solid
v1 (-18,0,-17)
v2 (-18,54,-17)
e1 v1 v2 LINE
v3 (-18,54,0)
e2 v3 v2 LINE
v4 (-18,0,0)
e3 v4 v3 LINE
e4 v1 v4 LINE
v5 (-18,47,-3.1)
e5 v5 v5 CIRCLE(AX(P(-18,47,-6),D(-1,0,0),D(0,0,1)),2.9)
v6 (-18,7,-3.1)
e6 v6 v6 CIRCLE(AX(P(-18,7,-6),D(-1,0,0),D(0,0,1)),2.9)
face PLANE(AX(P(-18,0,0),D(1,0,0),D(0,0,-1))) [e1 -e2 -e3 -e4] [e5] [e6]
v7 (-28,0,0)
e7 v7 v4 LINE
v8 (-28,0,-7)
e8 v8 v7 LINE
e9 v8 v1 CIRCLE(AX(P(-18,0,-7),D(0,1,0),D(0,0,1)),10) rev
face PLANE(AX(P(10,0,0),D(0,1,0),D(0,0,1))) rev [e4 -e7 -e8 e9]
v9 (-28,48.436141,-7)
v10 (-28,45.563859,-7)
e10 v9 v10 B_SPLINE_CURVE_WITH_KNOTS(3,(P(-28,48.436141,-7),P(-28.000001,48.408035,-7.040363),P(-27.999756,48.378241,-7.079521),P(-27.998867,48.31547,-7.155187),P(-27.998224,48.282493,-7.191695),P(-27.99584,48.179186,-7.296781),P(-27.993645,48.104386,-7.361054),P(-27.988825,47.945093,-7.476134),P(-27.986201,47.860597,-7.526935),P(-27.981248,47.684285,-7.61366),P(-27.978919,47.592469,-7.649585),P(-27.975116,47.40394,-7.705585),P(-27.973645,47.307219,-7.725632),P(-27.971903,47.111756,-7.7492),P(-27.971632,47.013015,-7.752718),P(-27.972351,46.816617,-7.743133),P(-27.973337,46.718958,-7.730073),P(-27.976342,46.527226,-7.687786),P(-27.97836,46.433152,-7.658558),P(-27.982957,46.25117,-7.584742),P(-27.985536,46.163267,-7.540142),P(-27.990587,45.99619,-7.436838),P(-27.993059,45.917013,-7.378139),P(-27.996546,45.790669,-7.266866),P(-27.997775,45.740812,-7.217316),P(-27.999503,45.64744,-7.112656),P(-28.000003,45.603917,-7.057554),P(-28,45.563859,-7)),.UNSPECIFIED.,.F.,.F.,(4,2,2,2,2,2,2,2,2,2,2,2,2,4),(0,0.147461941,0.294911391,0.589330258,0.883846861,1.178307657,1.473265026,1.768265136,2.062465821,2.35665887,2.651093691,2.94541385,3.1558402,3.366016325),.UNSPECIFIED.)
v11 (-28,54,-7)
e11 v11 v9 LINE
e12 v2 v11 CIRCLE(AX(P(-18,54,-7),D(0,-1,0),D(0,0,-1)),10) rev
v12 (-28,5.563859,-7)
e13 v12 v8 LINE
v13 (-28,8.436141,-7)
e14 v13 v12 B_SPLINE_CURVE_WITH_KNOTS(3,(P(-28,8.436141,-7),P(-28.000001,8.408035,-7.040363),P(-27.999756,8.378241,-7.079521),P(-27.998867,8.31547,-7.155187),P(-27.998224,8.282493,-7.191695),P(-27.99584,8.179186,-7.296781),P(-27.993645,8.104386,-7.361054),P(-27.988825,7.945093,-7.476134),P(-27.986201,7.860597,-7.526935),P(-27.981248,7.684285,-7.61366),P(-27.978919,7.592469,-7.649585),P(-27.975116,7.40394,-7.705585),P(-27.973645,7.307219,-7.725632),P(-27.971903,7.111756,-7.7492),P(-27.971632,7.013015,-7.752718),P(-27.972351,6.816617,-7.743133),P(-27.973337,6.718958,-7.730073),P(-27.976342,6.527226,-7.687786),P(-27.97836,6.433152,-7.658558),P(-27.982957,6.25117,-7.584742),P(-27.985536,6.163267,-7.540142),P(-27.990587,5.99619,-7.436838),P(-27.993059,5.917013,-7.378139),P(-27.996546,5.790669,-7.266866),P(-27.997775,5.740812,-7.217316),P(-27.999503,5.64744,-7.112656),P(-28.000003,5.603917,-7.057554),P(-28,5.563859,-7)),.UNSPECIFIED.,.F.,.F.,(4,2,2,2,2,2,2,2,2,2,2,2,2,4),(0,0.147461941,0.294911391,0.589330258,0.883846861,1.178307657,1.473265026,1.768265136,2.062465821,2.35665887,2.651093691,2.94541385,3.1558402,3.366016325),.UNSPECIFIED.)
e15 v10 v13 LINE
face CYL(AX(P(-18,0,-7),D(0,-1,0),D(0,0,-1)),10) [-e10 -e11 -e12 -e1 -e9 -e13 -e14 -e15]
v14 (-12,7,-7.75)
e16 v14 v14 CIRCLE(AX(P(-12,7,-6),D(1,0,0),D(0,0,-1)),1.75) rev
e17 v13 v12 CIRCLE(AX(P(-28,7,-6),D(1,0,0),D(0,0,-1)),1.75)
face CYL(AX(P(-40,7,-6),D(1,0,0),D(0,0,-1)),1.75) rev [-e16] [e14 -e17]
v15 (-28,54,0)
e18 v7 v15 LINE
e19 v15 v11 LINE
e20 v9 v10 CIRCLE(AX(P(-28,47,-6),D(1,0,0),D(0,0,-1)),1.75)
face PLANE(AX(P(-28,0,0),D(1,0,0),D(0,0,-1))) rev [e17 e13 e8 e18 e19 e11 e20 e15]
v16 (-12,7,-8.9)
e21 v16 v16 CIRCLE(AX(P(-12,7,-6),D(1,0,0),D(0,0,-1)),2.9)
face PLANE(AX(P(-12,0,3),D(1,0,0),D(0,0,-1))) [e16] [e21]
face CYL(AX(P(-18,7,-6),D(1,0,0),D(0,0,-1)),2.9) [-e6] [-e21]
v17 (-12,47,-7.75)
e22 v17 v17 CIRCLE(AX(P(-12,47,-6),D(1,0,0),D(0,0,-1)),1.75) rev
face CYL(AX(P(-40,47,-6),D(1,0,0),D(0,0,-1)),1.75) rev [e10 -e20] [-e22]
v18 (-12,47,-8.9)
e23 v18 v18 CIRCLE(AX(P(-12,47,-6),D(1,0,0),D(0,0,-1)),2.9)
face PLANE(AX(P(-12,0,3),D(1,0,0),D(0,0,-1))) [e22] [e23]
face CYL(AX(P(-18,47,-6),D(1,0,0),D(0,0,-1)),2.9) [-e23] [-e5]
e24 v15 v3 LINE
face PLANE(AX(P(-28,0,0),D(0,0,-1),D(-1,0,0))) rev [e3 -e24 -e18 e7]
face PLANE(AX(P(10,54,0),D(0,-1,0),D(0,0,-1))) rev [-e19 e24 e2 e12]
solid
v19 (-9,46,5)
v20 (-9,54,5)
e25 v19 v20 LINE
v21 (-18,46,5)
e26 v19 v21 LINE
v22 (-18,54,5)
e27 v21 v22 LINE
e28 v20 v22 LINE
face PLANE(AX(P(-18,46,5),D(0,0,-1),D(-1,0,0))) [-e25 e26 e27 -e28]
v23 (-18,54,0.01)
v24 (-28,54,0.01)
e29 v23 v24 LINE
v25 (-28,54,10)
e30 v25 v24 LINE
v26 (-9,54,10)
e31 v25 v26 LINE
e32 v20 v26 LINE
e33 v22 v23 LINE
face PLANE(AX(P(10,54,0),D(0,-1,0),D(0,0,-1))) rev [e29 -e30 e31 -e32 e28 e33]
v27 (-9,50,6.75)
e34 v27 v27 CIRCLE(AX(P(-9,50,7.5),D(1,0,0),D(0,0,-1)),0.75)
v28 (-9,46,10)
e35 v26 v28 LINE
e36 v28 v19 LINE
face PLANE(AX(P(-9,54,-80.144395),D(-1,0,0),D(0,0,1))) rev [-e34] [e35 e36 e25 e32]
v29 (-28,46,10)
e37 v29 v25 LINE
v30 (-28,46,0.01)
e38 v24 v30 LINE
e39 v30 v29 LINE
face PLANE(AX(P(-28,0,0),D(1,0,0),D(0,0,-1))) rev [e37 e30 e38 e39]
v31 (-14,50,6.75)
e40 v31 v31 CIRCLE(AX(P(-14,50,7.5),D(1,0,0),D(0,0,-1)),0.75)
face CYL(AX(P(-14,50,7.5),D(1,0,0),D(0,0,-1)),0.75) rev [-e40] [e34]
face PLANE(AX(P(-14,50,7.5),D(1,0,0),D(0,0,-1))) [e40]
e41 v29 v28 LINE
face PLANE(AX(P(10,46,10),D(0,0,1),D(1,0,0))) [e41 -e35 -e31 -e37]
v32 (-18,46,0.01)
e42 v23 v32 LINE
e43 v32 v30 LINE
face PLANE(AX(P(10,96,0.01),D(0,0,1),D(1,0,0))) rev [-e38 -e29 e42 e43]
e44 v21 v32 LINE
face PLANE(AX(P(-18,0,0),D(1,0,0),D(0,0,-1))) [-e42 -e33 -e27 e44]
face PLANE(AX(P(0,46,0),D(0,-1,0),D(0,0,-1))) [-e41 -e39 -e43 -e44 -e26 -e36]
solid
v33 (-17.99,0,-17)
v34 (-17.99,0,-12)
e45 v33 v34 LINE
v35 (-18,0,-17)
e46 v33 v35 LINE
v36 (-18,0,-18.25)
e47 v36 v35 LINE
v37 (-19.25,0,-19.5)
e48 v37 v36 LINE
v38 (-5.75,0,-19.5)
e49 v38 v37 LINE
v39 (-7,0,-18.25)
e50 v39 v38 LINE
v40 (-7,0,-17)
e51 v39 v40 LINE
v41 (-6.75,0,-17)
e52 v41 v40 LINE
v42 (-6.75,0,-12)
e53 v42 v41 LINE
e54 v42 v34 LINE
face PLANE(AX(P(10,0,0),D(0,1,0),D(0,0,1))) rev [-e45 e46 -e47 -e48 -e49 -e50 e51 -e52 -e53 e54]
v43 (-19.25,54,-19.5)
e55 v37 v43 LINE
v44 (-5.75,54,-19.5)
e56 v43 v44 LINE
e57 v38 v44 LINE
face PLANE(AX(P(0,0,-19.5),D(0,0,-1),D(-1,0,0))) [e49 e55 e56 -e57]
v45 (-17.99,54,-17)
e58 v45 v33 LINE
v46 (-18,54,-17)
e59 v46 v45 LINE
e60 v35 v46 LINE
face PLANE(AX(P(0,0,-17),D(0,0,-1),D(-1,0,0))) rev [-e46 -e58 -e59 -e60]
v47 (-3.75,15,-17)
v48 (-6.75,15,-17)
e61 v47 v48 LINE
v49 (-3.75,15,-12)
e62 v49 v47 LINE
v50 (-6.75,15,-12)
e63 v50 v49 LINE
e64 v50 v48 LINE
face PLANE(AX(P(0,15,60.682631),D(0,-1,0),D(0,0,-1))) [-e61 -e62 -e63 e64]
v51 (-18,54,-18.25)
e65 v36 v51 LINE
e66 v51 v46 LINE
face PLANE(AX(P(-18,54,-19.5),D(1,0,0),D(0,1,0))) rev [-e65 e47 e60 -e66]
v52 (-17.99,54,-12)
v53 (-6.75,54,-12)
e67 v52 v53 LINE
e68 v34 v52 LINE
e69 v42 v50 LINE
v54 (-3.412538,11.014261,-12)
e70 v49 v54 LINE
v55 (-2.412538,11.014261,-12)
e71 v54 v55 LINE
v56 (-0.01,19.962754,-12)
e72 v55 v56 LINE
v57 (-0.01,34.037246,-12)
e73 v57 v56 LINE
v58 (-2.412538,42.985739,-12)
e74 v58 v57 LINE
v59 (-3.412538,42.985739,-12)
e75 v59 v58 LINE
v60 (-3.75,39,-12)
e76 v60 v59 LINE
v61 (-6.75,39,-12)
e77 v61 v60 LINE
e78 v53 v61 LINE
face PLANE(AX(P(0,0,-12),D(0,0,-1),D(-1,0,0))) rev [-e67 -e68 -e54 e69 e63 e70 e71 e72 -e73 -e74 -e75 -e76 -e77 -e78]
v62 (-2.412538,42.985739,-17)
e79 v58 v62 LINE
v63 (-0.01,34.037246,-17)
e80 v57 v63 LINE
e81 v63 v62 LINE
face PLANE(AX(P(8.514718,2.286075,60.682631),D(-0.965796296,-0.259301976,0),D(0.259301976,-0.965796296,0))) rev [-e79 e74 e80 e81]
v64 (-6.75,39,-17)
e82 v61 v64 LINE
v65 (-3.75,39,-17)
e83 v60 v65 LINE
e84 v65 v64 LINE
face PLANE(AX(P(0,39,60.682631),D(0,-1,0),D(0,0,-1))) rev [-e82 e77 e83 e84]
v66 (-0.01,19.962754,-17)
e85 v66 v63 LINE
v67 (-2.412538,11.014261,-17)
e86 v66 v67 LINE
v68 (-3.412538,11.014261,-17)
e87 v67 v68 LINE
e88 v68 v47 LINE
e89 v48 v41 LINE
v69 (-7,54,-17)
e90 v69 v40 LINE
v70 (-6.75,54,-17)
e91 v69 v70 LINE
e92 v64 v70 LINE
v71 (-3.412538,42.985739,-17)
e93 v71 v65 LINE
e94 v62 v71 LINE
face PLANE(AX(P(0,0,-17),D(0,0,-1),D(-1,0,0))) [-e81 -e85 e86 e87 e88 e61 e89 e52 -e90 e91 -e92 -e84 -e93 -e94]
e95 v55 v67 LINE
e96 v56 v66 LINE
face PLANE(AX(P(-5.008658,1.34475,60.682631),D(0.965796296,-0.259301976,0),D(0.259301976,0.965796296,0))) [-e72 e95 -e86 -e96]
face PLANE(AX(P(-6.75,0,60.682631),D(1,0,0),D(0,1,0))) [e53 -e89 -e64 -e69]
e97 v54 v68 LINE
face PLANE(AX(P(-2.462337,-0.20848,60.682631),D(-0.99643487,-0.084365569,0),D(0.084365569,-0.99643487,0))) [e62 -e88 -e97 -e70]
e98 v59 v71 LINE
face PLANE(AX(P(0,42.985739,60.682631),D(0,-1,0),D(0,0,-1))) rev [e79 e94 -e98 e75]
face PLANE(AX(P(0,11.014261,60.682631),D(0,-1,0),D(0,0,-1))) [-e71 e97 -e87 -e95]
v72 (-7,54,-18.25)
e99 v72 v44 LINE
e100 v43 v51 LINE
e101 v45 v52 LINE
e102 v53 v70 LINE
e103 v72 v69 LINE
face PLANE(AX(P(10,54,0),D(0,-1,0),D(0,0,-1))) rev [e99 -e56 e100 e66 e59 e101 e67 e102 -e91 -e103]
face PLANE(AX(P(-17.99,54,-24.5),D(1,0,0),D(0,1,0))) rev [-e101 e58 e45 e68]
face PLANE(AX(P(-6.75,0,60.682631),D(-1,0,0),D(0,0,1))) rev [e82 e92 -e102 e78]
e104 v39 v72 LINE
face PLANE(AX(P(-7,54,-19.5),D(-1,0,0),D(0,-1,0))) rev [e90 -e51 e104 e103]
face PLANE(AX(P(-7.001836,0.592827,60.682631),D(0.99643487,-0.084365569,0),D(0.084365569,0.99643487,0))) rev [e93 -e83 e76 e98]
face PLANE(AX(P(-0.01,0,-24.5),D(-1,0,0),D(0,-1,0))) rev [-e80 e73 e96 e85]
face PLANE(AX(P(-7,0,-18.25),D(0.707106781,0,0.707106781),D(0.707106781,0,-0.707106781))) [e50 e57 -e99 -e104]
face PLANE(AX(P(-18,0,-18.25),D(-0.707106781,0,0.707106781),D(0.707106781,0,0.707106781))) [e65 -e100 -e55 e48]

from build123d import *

# Parameters (mm, degrees)
SKETCH1_W           = 12
SKETCH1_H           = 54
BOSS_EXTRUDE1_DEPTH = 10
SKETCH2_R           = 2.9
BOSS_EXTRUDE2_DEPTH = 18
SKETCH3_W           = 12
SKETCH3_H           = 54
BOSS_EXTRUDE3_DEPTH = 10
SKETCH4_R           = 1.75
CUT_EXTRUDE1_DEPTH  = 50
SKETCH5_W           = 38
SKETCH5_H           = 54
BOSS_EXTRUDE4_DEPTH = 5
FILLET1_R           = 10
SKETCH6_W           = 6
SKETCH6_H           = 54
CUT_EXTRUDE2_DEPTH  = 15
SKETCH7_W           = 0.01
SKETCH7_H           = 54
CUT_EXTRUDE3_DEPTH  = 12.5
BOSS_EXTRUDE5_DEPTH = 8
SKETCH9_W           = 38
SKETCH9_H           = 0.01
CUT_EXTRUDE4_DEPTH  = 50
SKETCH10_W          = 11
SKETCH10_H          = 54
BOSS_EXTRUDE6_DEPTH = 2.5
BOSS_EXTRUDE7_DEPTH = 54
CUT_EXTRUDE5_DEPTH  = 5
SKETCH14_W          = 32.887251504
SKETCH14_H          = 59.683223859
CUT_EXTRUDE6_DEPTH  = 22
SKETCH15_R          = 0.75
CUT_EXTRUDE7_DEPTH  = 5


with BuildPart() as part:
    # Sketch1 → Boss-Extrude1 (new body)
    with BuildSketch(Plane(origin=(0, 0, 0), x_dir=(0, 0, -1), z_dir=(1, 0, 0))):
        with Locations((6, 27)):
            Rectangle(SKETCH1_W, SKETCH1_H)
    extrude(amount=BOSS_EXTRUDE1_DEPTH)

    # Sketch2 → Boss-Extrude2 (add)
    with BuildSketch(Plane.ZY):
        with Locations((-6, 47)):
            Circle(SKETCH2_R)
        with Locations((-6, 7)):
            Circle(SKETCH2_R)
    extrude(amount=BOSS_EXTRUDE2_DEPTH)

    # Sketch3 → Boss-Extrude3 (add)
    with BuildSketch(Plane.ZY.offset(18)):
        with Locations((-6, 27)):
            Rectangle(SKETCH3_W, SKETCH3_H)
    extrude(amount=BOSS_EXTRUDE3_DEPTH)

    # Sketch4 → Cut-Extrude1 (cut)
    with BuildSketch(Plane(origin=(10, 0, 0), x_dir=(0, 0, -1), z_dir=(1, 0, 0))):
        with Locations((6, 47)):
            Circle(SKETCH4_R)
        with Locations((6, 7)):
            Circle(SKETCH4_R)
    extrude(amount=-CUT_EXTRUDE1_DEPTH, mode=Mode.SUBTRACT)

    # Sketch5 → Boss-Extrude4 (add)
    with BuildSketch(Plane(origin=(0, 0, -12), x_dir=(-1, 0, 0), z_dir=(0, 0, -1))):
        with Locations((9, 27)):
            Rectangle(SKETCH5_W, SKETCH5_H)
    extrude(amount=BOSS_EXTRUDE4_DEPTH)

    # Fillet1
    # the kernel refuses this fillet: 10 mm, written as the material it takes off along each edge
    with BuildSketch(Plane(origin=(10, -25, -17), x_dir=(-1, 0, 0), z_dir=(0, 1, 0))) as fillet1_piece_1:
        with BuildLine():
            CenterArc((FILLET1_R, FILLET1_R), FILLET1_R, 180, 90)
            Line((0, FILLET1_R), (0, 0))
            Line((0, 0), (FILLET1_R, 0))
        make_face()
    extrude(amount=104, mode=Mode.SUBTRACT)
    with BuildSketch(Plane(origin=(-28, 79, -17), x_dir=(0, 0, 1), z_dir=(0, -1, 0))) as fillet1_piece_2:
        with BuildLine():
            CenterArc((FILLET1_R, -FILLET1_R), FILLET1_R, 90, 90)
            Line((0, -FILLET1_R), (0, 0))
            Line((0, 0), (FILLET1_R, 0))
        make_face()
    extrude(amount=104, mode=Mode.SUBTRACT)

    # Sketch6 → Cut-Extrude2 (cut)
    with BuildSketch(Plane.XY.offset(-12)):
        with Locations((-9, 27)):
            Rectangle(SKETCH6_W, SKETCH6_H)
    extrude(amount=CUT_EXTRUDE2_DEPTH, mode=Mode.SUBTRACT)

    # Sketch7 → Cut-Extrude3 (cut)
    with BuildSketch(Plane.XY.offset(-12)):
        with Locations((-17.995, 27)):
            Rectangle(SKETCH7_W, SKETCH7_H)
        with Locations((-0.005, 27)):
            Rectangle(SKETCH7_W, SKETCH7_H)
    extrude(amount=-CUT_EXTRUDE3_DEPTH, mode=Mode.SUBTRACT)


with BuildPart() as cut_extrude3_piece_1:
    # of the separate pieces the step leaves, piece 1, a body of its own (cut_extrude3_pieces)
    add(part.part.solids().sort_by_distance((-18, 0, 0))[0])



with BuildPart() as cut_extrude3_piece_2:
    # of the separate pieces the step leaves, piece 2, a body of its own (cut_extrude3_pieces)
    add(part.part.solids().sort_by_distance((0, 0, -17))[0])


with BuildPart() as cut_extrude3_piece_3:
    # of the separate pieces the step leaves, piece 3, a body of its own (cut_extrude3_pieces)
    add(part.part.solids().sort_by_distance((-17.99, 0, -12))[0])



with BuildPart() as cut_extrude3_piece_1_1:
    add(cut_extrude3_piece_1.part)

    add(cut_extrude3_piece_2.part)  # Boss-Extrude5 merges Cut-Extrude3 piece 2
    # Sketch8 → Boss-Extrude5 (add)
    with BuildSketch(Plane(origin=(0, 54, 0), x_dir=(1, 0, 0), z_dir=(0, 1, 0))):
        Polygon((-18, 0), (-18, -5), (0, -5), (0, 0), (10, 0), (10, -10), (-28, -10), (-28, 0), align=None)
    extrude(amount=-BOSS_EXTRUDE5_DEPTH)

    # Sketch9 → Cut-Extrude4 (cut)
    with BuildSketch(Plane.XZ.offset(-46)):
        with Locations((-9, 0.005)):
            Rectangle(SKETCH9_W, SKETCH9_H)
    extrude(amount=-CUT_EXTRUDE4_DEPTH, mode=Mode.SUBTRACT)


with BuildPart() as cut_extrude4_piece_1:
    # of the separate pieces the step leaves, piece 1, a body of its own (cut_extrude4_pieces)
    add(cut_extrude3_piece_1_1.part.solids().sort_by_distance((0, 0, -17))[0])


with BuildPart() as cut_extrude4_piece_2:
    # of the separate pieces the step leaves, piece 2, a body of its own (cut_extrude4_pieces)
    add(cut_extrude3_piece_1_1.part.solids().sort_by_distance((-18, 0, 0))[0])


with BuildPart() as cut_extrude4_piece_3:
    # of the separate pieces the step leaves, piece 3, a body of its own (cut_extrude4_pieces)
    add(cut_extrude3_piece_1_1.part.solids().sort_by_distance((0, 54, 0.01))[0])


with BuildPart() as cut_extrude3_piece_3_1:
    add(cut_extrude3_piece_3.part)

    add(cut_extrude4_piece_2.part)  # Boss-Extrude6 merges Cut-Extrude4 piece 2
    # Sketch10 → Boss-Extrude6 (add)
    with BuildSketch(Plane(origin=(0, 0, -17), x_dir=(-1, 0, 0), z_dir=(0, 0, -1))):
        with Locations((12.5, 27)):
            Rectangle(SKETCH10_W, SKETCH10_H)
    extrude(amount=BOSS_EXTRUDE6_DEPTH)

    # Sketch11 → Boss-Extrude7 (add)
    with BuildSketch(Plane(origin=(0, 54, 0), x_dir=(1, 0, 0), z_dir=(0, 1, 0))):
        Polygon((-18, 18.25), (-19.25, 19.5), (-18, 19.5), align=None)
        Polygon((-7, 19.5), (-7, 18.25), (-5.75, 19.5), align=None)
    extrude(amount=-BOSS_EXTRUDE7_DEPTH)


with BuildPart() as cut_extrude5_tool:
    # Sketch13 → Cut-Extrude5 (new body)
    with BuildSketch(Plane(origin=(0, 0, -17), x_dir=(-1, 0, 0), z_dir=(0, 0, -1))):
        Polygon((0, 34), (0.01, 54), (5.75, 54), (5.75, 57.531607605), (-24.050626329, 57.531607605), (-24.050626329, -8.302169783), (5.75, -8.302169783), (5.75, 0), (0.01, 0), (0, 20), align=None)
        Polygon((5.75, 54), (0.01, 54), (0, 34), (2.412537726, 42.985739481), (3.412537726, 42.985739481), (3.75, 39), (4.75, 39), (5.75, 39), (6.75, 39), (6.75, 54), align=None)
        Polygon((2.412537726, 11.014260519), (0, 20), (0.01, 0), (5.75, 0), (6.75, 0), (6.75, 15), (5.75, 15), (4.75, 15), (3.75, 15), (3.412537726, 11.014260519), align=None)
    extrude(amount=-CUT_EXTRUDE5_DEPTH)


with BuildPart() as cut_extrude3_piece_3_2:
    add(cut_extrude3_piece_3_1.part)

    # Cut-Extrude5: cut by cut_extrude5_tool
    add(cut_extrude5_tool.part, mode=Mode.SUBTRACT)


with BuildPart() as cut_extrude4_piece_1_1:
    add(cut_extrude4_piece_1.part)

    # Cut-Extrude5: cut by cut_extrude5_tool
    add(cut_extrude5_tool.part, mode=Mode.SUBTRACT)


with BuildPart() as cut_extrude6_tool:
    # Sketch14 → Cut-Extrude6 (new body)
    with BuildSketch(Plane.XY.offset(10)):
        with Locations((7.443625752, 24.15838807)):
            Rectangle(SKETCH14_W, SKETCH14_H)
    extrude(amount=-CUT_EXTRUDE6_DEPTH)


with BuildPart() as cut_extrude4_piece_1_2:
    add(cut_extrude4_piece_1_1.part)

    # Cut-Extrude6: cut by cut_extrude6_tool
    add(cut_extrude6_tool.part, mode=Mode.SUBTRACT)


with BuildPart() as cut_extrude4_piece_3_1:
    add(cut_extrude4_piece_3.part)

    # Cut-Extrude6: cut by cut_extrude6_tool
    add(cut_extrude6_tool.part, mode=Mode.SUBTRACT)

    # Sketch15 → Cut-Extrude7 (cut)
    with BuildSketch(Plane(origin=(-9, 0, 0), x_dir=(0, 0, -1), z_dir=(1, 0, 0))):
        with Locations((-7.5, 50)):
            Circle(SKETCH15_R)
    extrude(amount=-CUT_EXTRUDE7_DEPTH, mode=Mode.SUBTRACT)


solid = Compound([cut_extrude3_piece_3_2.part, cut_extrude4_piece_3_1.part])
